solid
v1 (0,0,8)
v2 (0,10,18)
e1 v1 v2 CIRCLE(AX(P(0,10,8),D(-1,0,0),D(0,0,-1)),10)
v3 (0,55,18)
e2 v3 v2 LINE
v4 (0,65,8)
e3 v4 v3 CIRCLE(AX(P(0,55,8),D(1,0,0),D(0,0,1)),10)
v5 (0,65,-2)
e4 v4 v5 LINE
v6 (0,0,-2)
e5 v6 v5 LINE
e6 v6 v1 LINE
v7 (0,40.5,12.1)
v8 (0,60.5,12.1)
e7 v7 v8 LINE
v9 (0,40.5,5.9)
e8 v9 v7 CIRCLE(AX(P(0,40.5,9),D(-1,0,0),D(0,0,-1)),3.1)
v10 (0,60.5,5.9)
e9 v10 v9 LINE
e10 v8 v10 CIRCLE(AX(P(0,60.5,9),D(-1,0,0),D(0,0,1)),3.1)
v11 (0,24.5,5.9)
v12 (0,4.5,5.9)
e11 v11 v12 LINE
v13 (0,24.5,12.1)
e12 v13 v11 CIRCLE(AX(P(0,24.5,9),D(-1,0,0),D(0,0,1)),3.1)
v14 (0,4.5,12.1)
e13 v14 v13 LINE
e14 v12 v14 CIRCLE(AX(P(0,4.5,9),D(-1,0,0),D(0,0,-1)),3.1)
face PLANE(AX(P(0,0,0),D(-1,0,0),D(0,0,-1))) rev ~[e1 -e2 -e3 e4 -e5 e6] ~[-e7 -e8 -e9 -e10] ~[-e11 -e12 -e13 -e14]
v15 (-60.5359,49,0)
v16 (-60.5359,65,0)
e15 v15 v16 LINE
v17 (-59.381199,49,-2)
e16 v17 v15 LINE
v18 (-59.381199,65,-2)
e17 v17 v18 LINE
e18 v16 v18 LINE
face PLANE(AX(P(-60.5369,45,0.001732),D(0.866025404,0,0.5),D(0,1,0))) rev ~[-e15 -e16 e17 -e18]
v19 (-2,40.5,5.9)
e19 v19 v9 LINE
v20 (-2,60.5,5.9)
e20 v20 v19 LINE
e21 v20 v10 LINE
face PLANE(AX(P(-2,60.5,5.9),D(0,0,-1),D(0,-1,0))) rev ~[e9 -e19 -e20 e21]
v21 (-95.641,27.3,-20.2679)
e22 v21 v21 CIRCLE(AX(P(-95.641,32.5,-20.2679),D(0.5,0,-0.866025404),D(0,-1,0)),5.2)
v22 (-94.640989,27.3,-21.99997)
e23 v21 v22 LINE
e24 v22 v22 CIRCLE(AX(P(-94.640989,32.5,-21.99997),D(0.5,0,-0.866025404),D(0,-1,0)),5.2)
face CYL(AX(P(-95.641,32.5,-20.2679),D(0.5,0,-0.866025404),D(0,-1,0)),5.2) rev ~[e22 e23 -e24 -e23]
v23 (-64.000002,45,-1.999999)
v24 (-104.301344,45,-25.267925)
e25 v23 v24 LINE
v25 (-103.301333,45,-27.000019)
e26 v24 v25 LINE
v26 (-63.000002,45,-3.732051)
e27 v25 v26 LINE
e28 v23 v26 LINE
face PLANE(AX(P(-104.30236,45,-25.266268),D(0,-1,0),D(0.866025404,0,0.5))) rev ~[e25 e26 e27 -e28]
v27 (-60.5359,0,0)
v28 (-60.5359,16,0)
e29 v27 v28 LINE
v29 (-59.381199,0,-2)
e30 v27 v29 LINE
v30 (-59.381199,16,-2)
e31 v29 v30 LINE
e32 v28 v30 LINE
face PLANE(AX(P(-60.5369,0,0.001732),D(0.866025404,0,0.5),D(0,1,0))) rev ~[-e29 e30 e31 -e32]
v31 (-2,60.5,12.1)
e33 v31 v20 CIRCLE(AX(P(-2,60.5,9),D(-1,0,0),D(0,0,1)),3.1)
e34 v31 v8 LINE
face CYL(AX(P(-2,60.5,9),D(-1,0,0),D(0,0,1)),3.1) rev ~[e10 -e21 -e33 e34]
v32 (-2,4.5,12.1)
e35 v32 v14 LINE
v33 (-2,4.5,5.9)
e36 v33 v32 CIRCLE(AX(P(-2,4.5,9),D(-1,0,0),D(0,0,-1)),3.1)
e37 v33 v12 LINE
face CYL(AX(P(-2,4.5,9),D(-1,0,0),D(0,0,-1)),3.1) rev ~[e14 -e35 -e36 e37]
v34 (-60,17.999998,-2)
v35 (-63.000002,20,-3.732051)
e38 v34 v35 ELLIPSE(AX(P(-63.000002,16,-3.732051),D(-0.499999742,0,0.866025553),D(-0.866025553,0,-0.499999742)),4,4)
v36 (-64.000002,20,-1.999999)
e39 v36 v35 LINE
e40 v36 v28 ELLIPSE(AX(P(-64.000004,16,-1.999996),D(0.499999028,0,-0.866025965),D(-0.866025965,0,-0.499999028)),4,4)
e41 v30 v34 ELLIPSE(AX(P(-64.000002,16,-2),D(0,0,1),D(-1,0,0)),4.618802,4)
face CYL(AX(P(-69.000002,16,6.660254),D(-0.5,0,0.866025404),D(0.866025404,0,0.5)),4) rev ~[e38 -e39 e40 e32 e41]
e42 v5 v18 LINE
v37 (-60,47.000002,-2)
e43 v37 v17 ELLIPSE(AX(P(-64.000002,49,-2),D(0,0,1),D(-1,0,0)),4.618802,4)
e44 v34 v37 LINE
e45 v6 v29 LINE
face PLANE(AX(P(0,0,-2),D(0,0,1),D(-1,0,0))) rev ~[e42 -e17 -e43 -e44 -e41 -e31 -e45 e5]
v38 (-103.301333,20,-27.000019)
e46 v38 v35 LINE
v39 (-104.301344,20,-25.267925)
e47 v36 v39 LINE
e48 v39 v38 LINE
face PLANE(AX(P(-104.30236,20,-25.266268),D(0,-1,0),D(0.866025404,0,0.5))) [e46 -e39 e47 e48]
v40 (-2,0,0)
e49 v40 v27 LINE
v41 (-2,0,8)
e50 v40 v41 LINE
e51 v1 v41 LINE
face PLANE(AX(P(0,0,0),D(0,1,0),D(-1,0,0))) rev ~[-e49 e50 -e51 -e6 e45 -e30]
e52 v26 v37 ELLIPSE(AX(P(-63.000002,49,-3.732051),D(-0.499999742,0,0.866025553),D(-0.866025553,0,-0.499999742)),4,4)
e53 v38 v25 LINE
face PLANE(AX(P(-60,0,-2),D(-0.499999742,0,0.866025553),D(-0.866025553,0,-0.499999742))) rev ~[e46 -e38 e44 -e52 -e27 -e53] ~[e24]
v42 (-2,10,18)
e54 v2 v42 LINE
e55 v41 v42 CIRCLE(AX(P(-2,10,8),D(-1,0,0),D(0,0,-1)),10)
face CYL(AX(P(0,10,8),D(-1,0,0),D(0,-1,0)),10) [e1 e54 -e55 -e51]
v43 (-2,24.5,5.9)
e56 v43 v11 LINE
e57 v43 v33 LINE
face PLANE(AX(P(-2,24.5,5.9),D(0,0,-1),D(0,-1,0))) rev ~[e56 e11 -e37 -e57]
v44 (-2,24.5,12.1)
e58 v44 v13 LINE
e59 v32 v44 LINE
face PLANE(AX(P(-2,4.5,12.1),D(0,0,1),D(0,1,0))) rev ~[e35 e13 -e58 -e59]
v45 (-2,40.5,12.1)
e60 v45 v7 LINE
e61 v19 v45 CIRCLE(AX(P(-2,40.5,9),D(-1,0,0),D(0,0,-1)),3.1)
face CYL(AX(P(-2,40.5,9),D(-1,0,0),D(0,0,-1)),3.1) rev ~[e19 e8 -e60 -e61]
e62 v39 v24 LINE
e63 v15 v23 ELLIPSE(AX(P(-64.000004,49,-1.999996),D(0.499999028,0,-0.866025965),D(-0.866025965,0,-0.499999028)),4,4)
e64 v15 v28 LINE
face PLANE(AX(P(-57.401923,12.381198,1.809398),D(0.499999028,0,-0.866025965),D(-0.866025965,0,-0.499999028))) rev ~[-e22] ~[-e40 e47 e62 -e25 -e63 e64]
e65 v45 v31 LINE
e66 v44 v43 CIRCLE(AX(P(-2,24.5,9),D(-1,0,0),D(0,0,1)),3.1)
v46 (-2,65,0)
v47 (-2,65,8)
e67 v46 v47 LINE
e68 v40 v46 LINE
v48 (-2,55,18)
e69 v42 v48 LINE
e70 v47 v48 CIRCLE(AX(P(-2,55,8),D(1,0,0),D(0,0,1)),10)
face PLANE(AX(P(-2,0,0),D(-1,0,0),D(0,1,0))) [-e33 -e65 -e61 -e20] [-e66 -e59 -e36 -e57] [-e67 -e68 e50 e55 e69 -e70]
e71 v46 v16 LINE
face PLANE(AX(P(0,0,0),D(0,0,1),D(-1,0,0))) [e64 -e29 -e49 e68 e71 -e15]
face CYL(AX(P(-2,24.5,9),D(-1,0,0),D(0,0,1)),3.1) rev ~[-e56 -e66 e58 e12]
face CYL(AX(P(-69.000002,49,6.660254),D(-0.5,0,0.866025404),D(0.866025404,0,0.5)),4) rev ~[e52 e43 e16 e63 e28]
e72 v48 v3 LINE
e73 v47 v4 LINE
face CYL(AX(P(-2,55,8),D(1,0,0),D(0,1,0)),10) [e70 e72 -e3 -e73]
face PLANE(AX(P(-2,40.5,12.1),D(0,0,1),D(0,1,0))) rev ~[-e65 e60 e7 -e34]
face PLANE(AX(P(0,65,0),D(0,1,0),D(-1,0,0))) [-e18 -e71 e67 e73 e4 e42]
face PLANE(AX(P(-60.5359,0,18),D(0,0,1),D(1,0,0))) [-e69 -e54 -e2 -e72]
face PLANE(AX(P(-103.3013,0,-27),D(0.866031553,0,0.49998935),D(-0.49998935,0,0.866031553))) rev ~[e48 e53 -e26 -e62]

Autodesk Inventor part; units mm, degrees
ref_plane "YZ Plane" through (0, 0, 0) normal (1, 0, 0) x (0, 1, 0)
ref_plane "XZ Plane" through (0, 0, 0) normal (0, 1, 0) x (-1, 0, 0)
ref_plane "XY Plane" through (0, 0, 0) normal (0, 0, 1) x (1, 0, 0)
sketch "Skizze1" plane through (0, 0, 0) normal (0, 1, 0) x (-1, 0, 0)
  line L0 (0, 0) -> (0, -2)
  line L1 (0, -2) -> (60, -2)
  line L2 (60, -2) -> (103.3013, -27)
  line L3 (103.3013, -27) -> (104.3013, -25.2679)
  line L4 (0, 0) -> (60.5359, 0)
  line L5 (104.3013, -25.2679) -> (60.5359, 0)
  dimension "d0" = 2
  dimension "d1" = 60
  dimension "d2" = 50
  dimension "d3" = 150
  dimension "d4" = 2
  dimension "d42" = 0
extrude "Extrusion1" add sketch "Skizze1" along normal blind 65
sketch "Skizze2" plane through (-60.5359, 0, 0) normal (0, 0, 1) x (1, 0, 0)
  line L0 (60.5359, 0) -> (0.5359, 0) projected
  line L1 (60.5359, 0) -> (58.5359, 0)
  line L2 (58.5359, 0) -> (58.5359, 65)
  line L3 (58.5359, 65) -> (60.5359, 65)
  line L4 (60.5359, 65) -> (60.5359, 0)
  point P0 (58.5359, 0)
  dimension "d8" = 2
  dimension "d9" = 65
extrude "Extrusion2" add sketch "Skizze2" along normal blind 18
sketch "Skizze3" plane through (-2, 0, 0) normal (-1, 0, 0) x (0, 0, 1)
  line L0 (0, 0) -> (18, 0) projected
  line L1 (18, 65) -> (18, 0) projected
  line L2 (9, 24.5) -> (9, 4.5) construction
  line L3 (5.9, 24.5) -> (5.9, 4.5)
  line L4 (12.1, 4.5) -> (12.1, 24.5)
  arc A0 (12.1, 24.5) -> (5.9, 24.5) centre (9, 24.5) ccw
  arc A1 (5.9, 4.5) -> (12.1, 4.5) centre (9, 4.5) ccw
  line L5 (9, 60.5) -> (9, 40.5) construction
  line L6 (5.9, 60.5) -> (5.9, 40.5)
  line L7 (12.1, 40.5) -> (12.1, 60.5)
  arc A2 (12.1, 60.5) -> (5.9, 60.5) centre (9, 60.5) ccw
  arc A3 (5.9, 40.5) -> (12.1, 40.5) centre (9, 40.5) ccw
  line L8 (0, 0) -> (0, 65) projected
  point P0 (9, 14.5)
  point P1 (9, 50.5)
  dimension "d12" = 36
  dimension "d32" = 6.2
  dimension "d34" = 20
  dimension "d35" = 14.5
  dimension "d36" = 6.2
  dimension "d37" = 20
  dimension "d43" = 9
  dimension "d44" = 18
sketch "Skizze4" plane through (-60.5359, 0, 0) normal (-0.5, 0, 0.8660254) x (0.8660254, 0, 0.5)
  line L0 (-50.5359, 0) -> (0, 0) projected
  line L1 (-50.5359, 0) -> (-50.5359, 65) projected
  point P0 (52.4256, 0)
  point P1 (-40.5359, 32.5)
  dimension "d23" = 32.5
  dimension "d24" = 10
hole "Bohrung2" at (-95.641, 32.5, -20.2679) direction (0.5, 0, -0.8660254) diameter 10.4 end through all
extrude "Extrusion3" cut sketch "Skizze3" against normal blind 10
fillet "Rundung1" radius 10 4 edges at (-103.8013, 65, -26.134) (-103.8013, 0, -26.134) (-1, 0, 18) (-1, 65, 18)
sketch "Skizze6" plane through (-60.5359, 0, 0) normal (-0.5, 0, 0.8660254) x (0.8660254, 0, 0.5)
  line L0 (0, 0) -> (0, 65) projected
  line L1 (0, 0) -> (-50.536, 0)
  line L2 (-50.536, 0) -> (-50.536, 20)
  line L3 (-50.536, 20) -> (0, 20)
  line L4 (0, 20) -> (0, 0)
  line L5 (-40.5359, 65) -> (0, 65) projected
  line L6 (0, 65) -> (-50.536, 65)
  line L7 (-50.536, 65) -> (-50.536, 45)
  line L8 (-50.536, 45) -> (0, 45)
  line L9 (0, 45) -> (0, 65)
  point P0 (52.4256, 0)
  point P1 (0, 45)
  point P2 (0, 20)
  dimension "d46" = 50.536
  dimension "d47" = 20
  dimension "d48" = 50.536
  dimension "d49" = 20
extrude "Extrusion4" cut sketch "Skizze6" against normal blind 10
fillet "Rundung2" radius 4 2 edges at (-59.9585, 20, -1) (-59.9585, 45, -1)
equation "\"d36\" = d32"
equation "\"d37\" = d34"
equation "\"d43\" = 0.5 * d44"
properties part number "Lampenhalterung 2,0"
